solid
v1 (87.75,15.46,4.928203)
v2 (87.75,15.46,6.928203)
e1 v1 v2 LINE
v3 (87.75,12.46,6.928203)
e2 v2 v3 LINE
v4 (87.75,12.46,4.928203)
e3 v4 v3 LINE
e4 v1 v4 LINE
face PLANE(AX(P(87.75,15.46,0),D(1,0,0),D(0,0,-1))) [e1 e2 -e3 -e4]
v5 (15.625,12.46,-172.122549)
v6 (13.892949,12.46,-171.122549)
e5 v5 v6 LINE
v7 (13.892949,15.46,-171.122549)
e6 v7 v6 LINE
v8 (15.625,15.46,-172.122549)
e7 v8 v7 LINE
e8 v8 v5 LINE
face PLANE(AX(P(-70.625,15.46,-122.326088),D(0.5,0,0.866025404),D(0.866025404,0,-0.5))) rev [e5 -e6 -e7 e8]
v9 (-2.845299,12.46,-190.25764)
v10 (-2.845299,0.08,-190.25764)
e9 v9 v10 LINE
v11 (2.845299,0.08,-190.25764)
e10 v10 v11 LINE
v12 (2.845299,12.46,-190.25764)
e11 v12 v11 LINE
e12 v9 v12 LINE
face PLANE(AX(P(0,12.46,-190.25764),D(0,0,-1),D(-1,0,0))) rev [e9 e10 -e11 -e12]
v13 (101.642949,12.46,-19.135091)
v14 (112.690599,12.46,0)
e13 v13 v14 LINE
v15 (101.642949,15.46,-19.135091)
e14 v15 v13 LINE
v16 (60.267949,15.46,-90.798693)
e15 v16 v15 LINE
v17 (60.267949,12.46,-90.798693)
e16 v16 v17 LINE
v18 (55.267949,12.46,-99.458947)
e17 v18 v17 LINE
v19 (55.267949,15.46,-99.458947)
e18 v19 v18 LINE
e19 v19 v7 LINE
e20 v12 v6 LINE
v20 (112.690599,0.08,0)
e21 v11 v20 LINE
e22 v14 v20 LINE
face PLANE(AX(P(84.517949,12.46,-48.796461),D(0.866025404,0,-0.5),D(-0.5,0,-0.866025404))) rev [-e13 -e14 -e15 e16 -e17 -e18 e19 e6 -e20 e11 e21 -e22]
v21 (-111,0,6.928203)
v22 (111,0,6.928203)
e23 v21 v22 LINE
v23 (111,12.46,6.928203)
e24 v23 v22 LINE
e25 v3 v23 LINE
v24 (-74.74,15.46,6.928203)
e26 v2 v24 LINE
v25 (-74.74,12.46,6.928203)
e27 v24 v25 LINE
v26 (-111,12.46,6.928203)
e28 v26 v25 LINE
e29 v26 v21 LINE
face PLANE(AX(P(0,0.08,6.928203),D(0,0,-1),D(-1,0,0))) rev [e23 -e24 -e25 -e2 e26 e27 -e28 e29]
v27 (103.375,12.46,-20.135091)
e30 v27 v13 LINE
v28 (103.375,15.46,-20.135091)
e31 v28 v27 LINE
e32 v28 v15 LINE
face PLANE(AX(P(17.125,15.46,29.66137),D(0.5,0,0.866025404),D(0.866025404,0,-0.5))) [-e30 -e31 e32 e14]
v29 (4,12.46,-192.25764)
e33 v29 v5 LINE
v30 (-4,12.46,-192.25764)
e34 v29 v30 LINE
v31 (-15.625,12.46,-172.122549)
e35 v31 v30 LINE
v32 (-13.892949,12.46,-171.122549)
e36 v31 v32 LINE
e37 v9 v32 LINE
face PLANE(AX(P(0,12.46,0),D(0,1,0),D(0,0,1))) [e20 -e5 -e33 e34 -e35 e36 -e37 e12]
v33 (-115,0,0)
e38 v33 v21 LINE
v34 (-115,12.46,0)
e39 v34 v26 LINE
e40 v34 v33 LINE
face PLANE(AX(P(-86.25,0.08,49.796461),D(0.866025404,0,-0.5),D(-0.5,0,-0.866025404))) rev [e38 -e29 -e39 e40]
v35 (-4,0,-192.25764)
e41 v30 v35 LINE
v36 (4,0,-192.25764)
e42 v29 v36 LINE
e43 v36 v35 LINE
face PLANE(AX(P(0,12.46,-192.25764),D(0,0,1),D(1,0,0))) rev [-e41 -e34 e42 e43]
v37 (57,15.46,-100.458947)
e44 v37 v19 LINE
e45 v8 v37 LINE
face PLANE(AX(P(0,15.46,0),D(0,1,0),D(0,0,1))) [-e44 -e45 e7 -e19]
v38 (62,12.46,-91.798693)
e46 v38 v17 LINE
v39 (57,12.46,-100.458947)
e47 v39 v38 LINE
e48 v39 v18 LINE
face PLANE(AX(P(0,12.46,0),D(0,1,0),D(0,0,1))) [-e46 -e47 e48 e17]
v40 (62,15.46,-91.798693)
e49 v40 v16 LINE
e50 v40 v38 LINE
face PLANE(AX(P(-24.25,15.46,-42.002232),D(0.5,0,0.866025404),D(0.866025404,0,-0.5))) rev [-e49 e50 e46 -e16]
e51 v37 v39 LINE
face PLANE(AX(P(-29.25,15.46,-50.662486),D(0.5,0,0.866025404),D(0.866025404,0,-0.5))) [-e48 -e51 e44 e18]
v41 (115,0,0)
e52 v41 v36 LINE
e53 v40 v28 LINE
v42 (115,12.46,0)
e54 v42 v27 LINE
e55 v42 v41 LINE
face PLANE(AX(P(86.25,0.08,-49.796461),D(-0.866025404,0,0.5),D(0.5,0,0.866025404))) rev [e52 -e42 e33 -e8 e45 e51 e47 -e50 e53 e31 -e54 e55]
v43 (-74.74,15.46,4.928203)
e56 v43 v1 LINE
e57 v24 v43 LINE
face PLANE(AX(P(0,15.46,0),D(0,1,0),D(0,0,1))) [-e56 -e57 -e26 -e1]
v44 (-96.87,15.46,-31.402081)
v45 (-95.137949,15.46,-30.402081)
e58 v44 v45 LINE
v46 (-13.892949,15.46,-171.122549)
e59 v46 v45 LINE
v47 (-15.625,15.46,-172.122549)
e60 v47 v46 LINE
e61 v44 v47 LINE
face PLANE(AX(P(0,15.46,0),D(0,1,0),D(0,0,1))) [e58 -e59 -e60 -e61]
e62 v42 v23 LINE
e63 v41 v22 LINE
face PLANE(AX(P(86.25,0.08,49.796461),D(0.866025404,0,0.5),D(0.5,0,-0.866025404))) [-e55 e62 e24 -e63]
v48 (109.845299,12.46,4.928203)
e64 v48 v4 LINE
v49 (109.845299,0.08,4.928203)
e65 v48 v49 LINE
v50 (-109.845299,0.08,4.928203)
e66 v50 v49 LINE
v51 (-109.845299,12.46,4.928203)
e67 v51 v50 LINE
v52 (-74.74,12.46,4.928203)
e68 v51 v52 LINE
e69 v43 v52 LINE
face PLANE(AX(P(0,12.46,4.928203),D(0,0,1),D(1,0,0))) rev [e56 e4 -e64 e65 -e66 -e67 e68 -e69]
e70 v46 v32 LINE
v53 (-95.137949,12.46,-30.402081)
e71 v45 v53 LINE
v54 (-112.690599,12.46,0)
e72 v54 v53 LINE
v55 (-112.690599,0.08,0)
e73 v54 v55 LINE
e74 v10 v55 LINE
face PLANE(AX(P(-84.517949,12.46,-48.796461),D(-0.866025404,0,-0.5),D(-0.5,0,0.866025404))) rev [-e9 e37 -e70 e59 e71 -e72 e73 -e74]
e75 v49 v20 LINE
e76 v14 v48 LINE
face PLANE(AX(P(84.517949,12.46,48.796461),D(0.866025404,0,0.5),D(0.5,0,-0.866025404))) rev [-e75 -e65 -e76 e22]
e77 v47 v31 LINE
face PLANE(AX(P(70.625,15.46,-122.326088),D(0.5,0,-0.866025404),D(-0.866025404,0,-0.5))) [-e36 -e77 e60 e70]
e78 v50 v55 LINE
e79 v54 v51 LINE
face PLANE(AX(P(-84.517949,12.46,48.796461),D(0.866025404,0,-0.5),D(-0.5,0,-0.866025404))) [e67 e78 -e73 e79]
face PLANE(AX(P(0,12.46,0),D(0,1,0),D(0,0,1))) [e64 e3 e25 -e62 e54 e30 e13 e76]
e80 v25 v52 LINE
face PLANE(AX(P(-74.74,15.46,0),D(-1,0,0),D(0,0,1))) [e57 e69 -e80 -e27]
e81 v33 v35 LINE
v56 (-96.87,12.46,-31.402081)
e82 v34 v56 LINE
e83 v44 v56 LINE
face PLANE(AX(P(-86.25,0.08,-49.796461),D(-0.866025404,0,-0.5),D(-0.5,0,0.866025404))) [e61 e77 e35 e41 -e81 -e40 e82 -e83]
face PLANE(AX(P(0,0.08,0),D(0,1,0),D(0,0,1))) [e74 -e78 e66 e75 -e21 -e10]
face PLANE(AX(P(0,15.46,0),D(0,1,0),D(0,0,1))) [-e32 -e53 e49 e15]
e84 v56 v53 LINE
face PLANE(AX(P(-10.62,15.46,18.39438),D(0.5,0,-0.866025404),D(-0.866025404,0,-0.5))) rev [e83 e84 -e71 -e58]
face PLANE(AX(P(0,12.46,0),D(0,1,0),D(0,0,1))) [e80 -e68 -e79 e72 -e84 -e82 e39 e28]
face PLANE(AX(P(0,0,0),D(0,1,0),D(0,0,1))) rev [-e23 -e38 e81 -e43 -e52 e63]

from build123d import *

# Parameters (mm, degrees)
BOSS_EXTRUDE1_DEPTH = 0.08
BOSS_EXTRUDE2_DEPTH = 12.46
SKETCH1_4_W         = 162.49
SKETCH1_4_H         = 2
BOSS_EXTRUDE3_DEPTH = 15.46


# Read off the part's stored shape, not the designer's step: Boss-Extrude2
with BuildPart() as part:
    # Sketch1 → Boss-Extrude1 (new body)
    with BuildSketch(Plane(origin=(0, 0, 0), x_dir=(1, 0, 0), z_dir=(0, 1, 0))):
        Polygon((-115, 0), (-111, -6.92820323), (111, -6.92820323), (115, 0), (15.625, 172.122549002), (13.892949192, 171.122549002), (2.845299462, 190.25763964), (-2.845299462, 190.25763964), (-13.892949192, 171.122549002), (-15.625, 172.122549002), align=None)
    extrude(amount=BOSS_EXTRUDE1_DEPTH)

    # Boss-Extrude2 outline → Boss-Extrude2 (add)
    with BuildSketch(Plane(origin=(0, 0, 0), x_dir=(1, 0, 0), z_dir=(0, 1, 0))):
        Polygon((15.625, 172.122549002), (4, 192.25763964), (-4, 192.25763964), (-15.625, 172.122549002), (-13.892949192, 171.122549002), (-2.845299462, 190.25763964), (2.845299462, 190.25763964), (13.892949192, 171.122549002), align=None)
        Polygon((62, 91.798692801), (57, 100.458946839), (55.267949192, 99.458946839), (60.267949192, 90.798692801), align=None)
        Polygon((-95.137949192, 30.402081141), (-96.87, 31.402081141), (-115, 0), (-111, -6.92820323), (-74.74, -6.92820323), (-74.74, -4.92820323), (-109.845299462, -4.92820323), (-112.690598923, 0), align=None)
        Polygon((115, 0), (103.375, 20.135090638), (101.642949192, 19.135090638), (112.690598923, 0), (109.845299462, -4.92820323), (87.75, -4.92820323), (87.75, -6.92820323), (111, -6.92820323), align=None)
    extrude(amount=BOSS_EXTRUDE2_DEPTH)

    # Sketch1<4> → Boss-Extrude3 (add)
    with BuildSketch(Plane(origin=(0, 0, 0), x_dir=(1, 0, 0), z_dir=(0, 1, 0))):
        Polygon((-15.625, 172.122549002), (-96.87, 31.402081141), (-95.137949192, 30.402081141), (-13.892949192, 171.122549002), align=None)
        with Locations((6.505, -5.92820323)):
            Rectangle(SKETCH1_4_W, SKETCH1_4_H)
        Polygon((57, 100.458946839), (15.625, 172.122549002), (13.892949192, 171.122549002), (55.267949192, 99.458946839), align=None)
        Polygon((101.642949192, 19.135090638), (103.375, 20.135090638), (62, 91.798692801), (60.267949192, 90.798692801), align=None)
    extrude(amount=BOSS_EXTRUDE3_DEPTH)


solid = part.part
